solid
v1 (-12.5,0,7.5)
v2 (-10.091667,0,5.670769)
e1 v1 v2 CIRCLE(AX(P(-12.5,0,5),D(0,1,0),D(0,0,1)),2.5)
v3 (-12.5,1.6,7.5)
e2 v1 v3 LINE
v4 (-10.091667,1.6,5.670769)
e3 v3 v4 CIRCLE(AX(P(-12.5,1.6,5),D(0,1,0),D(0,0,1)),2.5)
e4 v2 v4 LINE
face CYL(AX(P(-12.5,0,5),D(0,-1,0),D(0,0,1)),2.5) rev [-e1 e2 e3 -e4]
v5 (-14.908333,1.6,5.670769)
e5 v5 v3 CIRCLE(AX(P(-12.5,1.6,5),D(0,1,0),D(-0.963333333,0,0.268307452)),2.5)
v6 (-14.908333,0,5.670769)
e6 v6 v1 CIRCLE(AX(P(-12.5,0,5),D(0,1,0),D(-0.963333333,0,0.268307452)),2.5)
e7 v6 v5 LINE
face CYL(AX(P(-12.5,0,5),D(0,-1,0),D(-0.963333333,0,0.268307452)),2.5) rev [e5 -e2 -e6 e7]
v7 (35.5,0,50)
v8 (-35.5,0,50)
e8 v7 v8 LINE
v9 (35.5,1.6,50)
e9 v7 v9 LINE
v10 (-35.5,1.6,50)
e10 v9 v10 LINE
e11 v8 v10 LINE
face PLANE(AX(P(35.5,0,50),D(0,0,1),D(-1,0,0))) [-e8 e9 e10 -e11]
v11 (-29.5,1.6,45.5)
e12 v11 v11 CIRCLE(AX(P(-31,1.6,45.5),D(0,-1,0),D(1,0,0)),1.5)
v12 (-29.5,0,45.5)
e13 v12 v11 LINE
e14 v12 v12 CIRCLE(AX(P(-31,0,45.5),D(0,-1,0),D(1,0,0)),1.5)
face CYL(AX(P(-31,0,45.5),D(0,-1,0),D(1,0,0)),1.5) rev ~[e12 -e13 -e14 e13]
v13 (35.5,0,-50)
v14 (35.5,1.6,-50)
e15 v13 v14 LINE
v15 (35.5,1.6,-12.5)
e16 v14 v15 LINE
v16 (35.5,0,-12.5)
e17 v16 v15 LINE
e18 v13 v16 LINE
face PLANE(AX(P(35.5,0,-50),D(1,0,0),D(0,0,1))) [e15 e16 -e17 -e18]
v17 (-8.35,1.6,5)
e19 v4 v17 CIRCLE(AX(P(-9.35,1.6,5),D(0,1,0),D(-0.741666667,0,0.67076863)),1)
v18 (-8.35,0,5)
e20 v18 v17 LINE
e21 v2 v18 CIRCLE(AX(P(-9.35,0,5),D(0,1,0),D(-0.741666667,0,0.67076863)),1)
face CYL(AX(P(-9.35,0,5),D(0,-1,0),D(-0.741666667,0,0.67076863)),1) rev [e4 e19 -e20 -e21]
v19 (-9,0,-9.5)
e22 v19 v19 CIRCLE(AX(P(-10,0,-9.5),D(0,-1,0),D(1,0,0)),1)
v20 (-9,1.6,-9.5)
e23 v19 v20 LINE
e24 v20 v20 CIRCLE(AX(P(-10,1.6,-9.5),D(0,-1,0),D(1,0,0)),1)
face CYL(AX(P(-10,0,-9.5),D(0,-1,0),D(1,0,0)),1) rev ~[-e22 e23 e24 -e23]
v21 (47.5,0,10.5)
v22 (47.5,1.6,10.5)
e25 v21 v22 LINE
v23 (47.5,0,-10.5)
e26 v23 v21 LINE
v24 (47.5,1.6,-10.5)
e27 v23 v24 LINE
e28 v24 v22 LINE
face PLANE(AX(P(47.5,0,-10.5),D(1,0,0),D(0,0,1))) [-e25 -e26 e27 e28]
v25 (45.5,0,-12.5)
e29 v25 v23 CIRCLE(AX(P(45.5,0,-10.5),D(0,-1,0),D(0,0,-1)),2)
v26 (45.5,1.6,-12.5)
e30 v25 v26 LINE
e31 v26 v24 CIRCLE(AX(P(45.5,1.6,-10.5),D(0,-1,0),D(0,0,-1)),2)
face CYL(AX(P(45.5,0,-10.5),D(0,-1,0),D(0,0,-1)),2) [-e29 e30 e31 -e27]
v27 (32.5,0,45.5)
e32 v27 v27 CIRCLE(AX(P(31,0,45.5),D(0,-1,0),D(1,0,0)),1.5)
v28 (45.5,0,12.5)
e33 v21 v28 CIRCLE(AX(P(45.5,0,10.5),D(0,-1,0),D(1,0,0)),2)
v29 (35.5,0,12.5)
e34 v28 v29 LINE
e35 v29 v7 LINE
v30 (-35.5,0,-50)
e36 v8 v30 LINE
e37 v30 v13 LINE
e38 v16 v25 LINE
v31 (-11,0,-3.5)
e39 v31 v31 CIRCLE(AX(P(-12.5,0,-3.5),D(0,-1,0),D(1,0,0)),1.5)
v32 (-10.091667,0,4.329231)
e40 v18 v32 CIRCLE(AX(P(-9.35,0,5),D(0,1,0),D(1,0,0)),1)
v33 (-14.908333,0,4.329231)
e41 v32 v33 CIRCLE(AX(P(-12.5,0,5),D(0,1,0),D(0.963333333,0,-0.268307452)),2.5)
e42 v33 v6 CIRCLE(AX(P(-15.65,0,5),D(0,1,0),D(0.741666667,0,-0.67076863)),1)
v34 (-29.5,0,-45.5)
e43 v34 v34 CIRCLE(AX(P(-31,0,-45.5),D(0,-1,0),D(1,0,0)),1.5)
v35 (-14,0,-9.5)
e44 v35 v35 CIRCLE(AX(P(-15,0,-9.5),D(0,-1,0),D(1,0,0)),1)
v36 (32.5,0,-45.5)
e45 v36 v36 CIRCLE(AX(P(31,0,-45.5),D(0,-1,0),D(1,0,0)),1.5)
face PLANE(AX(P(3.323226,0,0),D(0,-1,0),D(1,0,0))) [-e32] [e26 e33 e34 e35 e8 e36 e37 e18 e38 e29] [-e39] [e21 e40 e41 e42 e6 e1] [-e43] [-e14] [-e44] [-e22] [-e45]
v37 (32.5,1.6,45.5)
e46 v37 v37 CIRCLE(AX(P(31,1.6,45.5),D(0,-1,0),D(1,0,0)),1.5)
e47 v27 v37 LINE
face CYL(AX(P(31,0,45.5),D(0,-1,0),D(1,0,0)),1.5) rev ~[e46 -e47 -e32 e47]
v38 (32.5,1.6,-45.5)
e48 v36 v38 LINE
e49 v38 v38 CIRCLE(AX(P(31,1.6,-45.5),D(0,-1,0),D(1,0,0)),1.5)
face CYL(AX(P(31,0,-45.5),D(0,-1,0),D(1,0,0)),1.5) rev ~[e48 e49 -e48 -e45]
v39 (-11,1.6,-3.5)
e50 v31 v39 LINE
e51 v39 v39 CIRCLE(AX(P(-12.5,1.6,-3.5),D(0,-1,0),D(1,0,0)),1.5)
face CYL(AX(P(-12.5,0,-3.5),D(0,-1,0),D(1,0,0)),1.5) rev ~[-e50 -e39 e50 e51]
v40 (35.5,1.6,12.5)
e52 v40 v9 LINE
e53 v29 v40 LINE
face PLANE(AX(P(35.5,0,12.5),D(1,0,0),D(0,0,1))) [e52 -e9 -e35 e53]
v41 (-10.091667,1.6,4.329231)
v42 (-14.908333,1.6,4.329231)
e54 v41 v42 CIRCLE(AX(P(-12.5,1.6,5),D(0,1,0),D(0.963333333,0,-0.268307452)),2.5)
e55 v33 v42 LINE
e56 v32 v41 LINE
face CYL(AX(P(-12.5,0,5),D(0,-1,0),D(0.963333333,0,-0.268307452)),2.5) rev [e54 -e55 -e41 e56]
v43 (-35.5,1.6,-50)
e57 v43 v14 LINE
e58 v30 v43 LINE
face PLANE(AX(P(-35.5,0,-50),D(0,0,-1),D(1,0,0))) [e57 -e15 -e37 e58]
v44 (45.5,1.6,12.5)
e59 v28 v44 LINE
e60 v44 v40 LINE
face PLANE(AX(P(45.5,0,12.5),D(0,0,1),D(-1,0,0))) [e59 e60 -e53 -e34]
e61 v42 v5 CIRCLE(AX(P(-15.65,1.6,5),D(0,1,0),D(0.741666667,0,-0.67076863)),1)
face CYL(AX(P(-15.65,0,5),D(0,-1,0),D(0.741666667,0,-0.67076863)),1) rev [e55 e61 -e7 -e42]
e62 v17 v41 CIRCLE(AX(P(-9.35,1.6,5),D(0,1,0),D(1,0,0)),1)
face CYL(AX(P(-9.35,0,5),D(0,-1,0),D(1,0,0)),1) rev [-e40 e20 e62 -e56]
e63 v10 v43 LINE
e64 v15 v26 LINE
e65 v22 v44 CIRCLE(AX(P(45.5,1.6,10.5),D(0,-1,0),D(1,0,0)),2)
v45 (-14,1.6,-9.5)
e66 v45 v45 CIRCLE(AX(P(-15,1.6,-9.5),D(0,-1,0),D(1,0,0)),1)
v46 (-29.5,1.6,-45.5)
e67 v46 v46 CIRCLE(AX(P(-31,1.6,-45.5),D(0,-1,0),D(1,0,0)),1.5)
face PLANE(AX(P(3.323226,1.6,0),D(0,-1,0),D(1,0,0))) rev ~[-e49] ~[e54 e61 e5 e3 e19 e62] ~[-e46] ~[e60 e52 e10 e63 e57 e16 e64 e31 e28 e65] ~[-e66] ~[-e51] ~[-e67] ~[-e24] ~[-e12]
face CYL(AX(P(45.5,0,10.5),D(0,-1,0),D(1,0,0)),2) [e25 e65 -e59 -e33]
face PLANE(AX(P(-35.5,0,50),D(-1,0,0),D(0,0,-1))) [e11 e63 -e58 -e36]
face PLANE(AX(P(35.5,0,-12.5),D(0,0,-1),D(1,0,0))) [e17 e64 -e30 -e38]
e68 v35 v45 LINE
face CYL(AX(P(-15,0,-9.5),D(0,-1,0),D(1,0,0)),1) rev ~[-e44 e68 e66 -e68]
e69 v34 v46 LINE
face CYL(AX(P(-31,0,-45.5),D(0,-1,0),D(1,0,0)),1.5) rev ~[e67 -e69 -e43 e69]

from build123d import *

# Parameters (mm, degrees)
F0_R     = 1.5
F0_R_2   = 1
F1_DEPTH = 1.6


with BuildPart() as f1:
    # F0 (on Front) → F1 (new body)
    with BuildSketch(Plane.XZ):
        with BuildLine():
            Line((35.5, 50), (-35.5, 50))
            Line((-35.5, 50), (-35.5, 35))
            Line((-35.5, 35), (-35.5, -27))
            Line((-35.5, -27), (-35.5, -50))
            Line((-35.5, -50), (35.5, -50))
            Line((35.5, -50), (35.5, -12.5))
            Line((35.5, -12.5), (45.5, -12.5))
            ThreePointArc((45.5, -12.5), (46.9142135624, -11.9142135624), (47.5, -10.5))
            Line((47.5, -10.5), (47.5, 10.5))
            ThreePointArc((47.5, 10.5), (46.9142135624, 11.9142135624), (45.5, 12.5))
            Line((45.5, 12.5), (35.5, 12.5))
            Line((35.5, 12.5), (35.5, 50))
        make_face()
        with Locations((-31, -45.5)):
            Circle(F0_R, mode=Mode.SUBTRACT)
        with Locations((-15, -9.5)):
            Circle(F0_R_2, mode=Mode.SUBTRACT)
        with Locations((-10, -9.5)):
            Circle(F0_R_2, mode=Mode.SUBTRACT)
        with Locations((-12.5, -3.5)):
            Circle(F0_R, mode=Mode.SUBTRACT)
        with Locations((31, -45.5)):
            Circle(F0_R, mode=Mode.SUBTRACT)
        with BuildLine():
            ThreePointArc((-12.5, 7.5), (-10.9878693139, 6.99084424), (-10.0916666667, 5.6707686304))
            ThreePointArc((-10.0916666667, 5.6707686304), (-8.9906023558, 5.9331845119), (-8.35, 5))
            ThreePointArc((-8.35, 5), (-8.9906023558, 4.0668154881), (-10.0916666667, 4.3292313696))
            ThreePointArc((-10.0916666667, 4.3292313696), (-12.5, 2.5), (-14.9083333333, 4.3292313696))
            ThreePointArc((-14.9083333333, 4.3292313696), (-16.65, 5), (-14.9083333333, 5.6707686304))
            ThreePointArc((-14.9083333333, 5.6707686304), (-14.0121306861, 6.99084424), (-12.5, 7.5))
        make_face(mode=Mode.SUBTRACT)
        with Locations((-31, 45.5)):
            Circle(F0_R, mode=Mode.SUBTRACT)
        with Locations((31, 45.5)):
            Circle(F0_R, mode=Mode.SUBTRACT)
    extrude(amount=-F1_DEPTH)


solid = f1.part
